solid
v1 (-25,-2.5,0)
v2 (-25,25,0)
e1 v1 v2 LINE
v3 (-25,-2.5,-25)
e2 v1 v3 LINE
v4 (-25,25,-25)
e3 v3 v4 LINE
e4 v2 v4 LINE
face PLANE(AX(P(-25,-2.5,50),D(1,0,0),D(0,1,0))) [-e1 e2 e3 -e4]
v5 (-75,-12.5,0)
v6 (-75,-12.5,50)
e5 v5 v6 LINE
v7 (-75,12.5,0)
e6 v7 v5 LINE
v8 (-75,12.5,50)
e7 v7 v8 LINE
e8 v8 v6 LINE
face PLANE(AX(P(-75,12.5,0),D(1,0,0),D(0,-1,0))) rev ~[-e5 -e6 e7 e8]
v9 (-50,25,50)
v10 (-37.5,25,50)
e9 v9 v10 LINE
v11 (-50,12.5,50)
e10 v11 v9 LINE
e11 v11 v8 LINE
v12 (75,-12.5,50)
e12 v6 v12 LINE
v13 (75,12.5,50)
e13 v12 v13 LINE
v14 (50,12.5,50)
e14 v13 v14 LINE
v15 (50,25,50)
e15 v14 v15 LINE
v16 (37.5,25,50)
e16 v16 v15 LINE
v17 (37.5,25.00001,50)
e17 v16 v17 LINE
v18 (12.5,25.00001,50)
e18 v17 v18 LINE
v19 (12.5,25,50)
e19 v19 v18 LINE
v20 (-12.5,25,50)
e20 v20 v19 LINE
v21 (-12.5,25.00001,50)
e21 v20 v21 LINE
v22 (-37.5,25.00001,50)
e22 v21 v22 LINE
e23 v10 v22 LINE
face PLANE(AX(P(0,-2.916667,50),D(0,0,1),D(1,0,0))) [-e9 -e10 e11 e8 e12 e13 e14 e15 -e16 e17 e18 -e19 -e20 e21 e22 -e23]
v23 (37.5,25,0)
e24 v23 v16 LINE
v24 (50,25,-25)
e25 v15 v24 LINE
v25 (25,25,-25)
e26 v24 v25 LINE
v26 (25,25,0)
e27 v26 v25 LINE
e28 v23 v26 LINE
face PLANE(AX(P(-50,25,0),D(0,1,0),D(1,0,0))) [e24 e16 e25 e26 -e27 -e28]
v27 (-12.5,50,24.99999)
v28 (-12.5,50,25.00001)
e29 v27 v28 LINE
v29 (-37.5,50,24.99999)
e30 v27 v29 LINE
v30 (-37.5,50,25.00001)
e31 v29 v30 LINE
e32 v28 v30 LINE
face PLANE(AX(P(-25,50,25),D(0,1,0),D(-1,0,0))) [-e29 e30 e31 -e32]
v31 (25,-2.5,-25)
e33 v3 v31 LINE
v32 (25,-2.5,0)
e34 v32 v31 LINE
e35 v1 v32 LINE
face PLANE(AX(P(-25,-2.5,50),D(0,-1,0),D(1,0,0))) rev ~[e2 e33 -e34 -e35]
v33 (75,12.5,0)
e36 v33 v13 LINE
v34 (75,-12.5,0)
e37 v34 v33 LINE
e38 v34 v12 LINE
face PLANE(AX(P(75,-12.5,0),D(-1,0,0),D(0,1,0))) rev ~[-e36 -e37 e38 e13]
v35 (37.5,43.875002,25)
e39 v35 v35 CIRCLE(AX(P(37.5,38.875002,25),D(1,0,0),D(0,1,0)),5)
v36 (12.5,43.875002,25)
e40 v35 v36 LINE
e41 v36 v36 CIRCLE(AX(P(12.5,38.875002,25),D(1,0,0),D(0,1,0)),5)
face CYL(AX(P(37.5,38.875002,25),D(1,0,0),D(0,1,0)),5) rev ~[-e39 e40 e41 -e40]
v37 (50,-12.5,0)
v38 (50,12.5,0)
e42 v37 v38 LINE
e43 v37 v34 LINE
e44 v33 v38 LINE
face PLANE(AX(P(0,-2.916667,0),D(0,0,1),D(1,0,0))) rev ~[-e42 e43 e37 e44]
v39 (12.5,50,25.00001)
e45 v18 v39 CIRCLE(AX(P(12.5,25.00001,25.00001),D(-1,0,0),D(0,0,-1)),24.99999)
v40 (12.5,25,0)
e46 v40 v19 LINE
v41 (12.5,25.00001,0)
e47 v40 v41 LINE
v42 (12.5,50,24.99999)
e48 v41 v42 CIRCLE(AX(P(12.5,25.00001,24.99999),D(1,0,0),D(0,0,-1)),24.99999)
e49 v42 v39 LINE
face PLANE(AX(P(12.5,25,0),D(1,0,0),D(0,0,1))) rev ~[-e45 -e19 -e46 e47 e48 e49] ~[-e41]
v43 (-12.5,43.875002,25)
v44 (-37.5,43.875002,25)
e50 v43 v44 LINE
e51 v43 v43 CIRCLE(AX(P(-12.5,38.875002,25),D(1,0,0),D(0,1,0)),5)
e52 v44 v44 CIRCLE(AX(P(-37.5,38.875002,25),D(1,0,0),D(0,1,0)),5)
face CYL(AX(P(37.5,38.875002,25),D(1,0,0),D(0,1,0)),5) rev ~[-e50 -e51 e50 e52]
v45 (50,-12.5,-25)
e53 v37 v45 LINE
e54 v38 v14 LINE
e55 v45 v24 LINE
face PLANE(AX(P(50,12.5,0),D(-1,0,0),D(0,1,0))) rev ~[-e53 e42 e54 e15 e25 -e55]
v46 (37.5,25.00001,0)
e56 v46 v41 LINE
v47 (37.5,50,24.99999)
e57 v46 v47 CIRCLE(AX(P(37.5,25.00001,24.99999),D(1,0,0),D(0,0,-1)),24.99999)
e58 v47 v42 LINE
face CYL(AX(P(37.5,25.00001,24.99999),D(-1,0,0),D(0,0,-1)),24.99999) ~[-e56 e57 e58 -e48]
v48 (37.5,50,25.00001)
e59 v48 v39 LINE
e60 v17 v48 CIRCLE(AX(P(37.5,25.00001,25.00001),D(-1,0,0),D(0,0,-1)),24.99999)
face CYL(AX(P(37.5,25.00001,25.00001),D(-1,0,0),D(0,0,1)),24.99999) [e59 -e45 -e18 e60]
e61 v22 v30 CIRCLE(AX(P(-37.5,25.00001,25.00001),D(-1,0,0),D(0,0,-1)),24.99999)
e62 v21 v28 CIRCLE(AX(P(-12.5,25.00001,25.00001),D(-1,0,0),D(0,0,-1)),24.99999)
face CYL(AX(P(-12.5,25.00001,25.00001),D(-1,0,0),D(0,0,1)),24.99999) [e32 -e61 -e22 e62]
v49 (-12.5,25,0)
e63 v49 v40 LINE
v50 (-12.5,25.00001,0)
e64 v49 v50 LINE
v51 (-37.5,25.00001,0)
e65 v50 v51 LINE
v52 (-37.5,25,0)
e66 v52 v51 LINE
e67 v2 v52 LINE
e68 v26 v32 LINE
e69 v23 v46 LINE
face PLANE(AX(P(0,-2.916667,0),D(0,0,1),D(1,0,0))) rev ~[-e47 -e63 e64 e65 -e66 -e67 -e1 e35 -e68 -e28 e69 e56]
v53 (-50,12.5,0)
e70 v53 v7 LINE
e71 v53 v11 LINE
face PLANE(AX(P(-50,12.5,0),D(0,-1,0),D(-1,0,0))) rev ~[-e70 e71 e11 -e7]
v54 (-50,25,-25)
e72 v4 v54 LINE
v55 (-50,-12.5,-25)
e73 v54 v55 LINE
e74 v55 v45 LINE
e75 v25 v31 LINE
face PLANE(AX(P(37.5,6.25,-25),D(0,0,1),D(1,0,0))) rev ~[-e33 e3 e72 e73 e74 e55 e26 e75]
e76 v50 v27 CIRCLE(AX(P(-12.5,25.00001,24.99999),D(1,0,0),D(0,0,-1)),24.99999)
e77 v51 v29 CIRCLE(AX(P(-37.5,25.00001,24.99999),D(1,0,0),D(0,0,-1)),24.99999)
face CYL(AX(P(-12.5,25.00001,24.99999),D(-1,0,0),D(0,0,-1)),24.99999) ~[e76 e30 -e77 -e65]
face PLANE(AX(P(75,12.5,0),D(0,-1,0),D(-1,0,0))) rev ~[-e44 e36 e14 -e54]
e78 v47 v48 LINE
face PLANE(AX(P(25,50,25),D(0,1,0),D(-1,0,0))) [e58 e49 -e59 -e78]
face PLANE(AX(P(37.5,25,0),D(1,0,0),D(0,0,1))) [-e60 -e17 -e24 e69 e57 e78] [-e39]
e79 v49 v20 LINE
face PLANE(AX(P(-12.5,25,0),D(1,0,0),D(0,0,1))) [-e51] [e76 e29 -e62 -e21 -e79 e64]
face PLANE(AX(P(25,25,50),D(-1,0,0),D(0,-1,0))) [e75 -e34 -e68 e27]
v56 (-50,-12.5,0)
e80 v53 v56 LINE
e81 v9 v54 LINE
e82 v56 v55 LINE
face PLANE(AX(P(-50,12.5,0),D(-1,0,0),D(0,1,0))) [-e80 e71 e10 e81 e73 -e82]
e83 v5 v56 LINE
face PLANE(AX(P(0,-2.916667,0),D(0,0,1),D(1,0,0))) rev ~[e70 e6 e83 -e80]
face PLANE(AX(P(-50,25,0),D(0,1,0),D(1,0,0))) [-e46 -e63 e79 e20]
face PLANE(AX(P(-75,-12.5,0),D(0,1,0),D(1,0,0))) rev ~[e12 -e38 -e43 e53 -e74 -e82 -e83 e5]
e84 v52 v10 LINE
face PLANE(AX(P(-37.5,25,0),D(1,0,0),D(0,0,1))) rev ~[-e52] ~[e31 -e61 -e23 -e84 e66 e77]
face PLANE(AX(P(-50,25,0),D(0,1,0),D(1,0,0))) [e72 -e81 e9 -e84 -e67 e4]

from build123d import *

# Parameters (mm, degrees)
F0_W     = 100
F0_H     = 12.5
F1_DEPTH = 50
F2_W     = 25
F2_H     = 50
F3_DEPTH = 25
F4_R     = 24.99999
F5_R     = 5
F6_DEPTH = 112.501
F7_W     = 50
F7_H     = 10
F8_DEPTH = 75


# Not quite as in the source:
# - a fillet or chamfer is up to 0.001 mm smaller than in the source, because OpenCascade refuses the exact size


with BuildPart() as f1:
    # F0 (on Top) → F1 (new body)
    with BuildSketch(Plane.XY):
        Polygon((75, -12.5), (75, 12.5), (50, 12.5), (50, 0), (-50, 0), (-50, 12.5), (-75, 12.5), (-75, -12.5), align=None)
        with Locations((0, 6.25)):
            Rectangle(F0_W, F0_H)
        with Locations((0, 18.75)):
            Rectangle(F0_W, F0_H)
    extrude(amount=F1_DEPTH)

    # F2 (on face) → F3 (join)
    with BuildSketch(Plane(origin=(0, 25, 0), x_dir=(-1, 0, 0), z_dir=(0, 1, 0))):
        with Locations((-25, 25)):
            Rectangle(F2_W, F2_H)
        with Locations((25, 25)):
            Rectangle(F2_W, F2_H)
    extrude(amount=F3_DEPTH)

    # F4 (radius 25 in the source; OpenCascade refuses exactly that, so slightly less here)
    f4_edges = [f1.edges().sort_by_distance(p)[0] for p in [
        (25, 50, 50),
        (25, 50, 0),
        (-25, 50, 0),
        (-25, 50, 50),
    ]]
    fillet(f4_edges, radius=F4_R)

    # F5 (on face) → F6 (cut, through all)
    with BuildSketch(Plane.YZ.offset(37.5)):
        with Locations((38.875002414, 25)):
            Circle(F5_R)
    extrude(amount=-F6_DEPTH, mode=Mode.SUBTRACT)

    # F7 (on face) → F8 (join)
    with BuildSketch(Plane.XY.offset(50)):
        Polygon((25, 25), (25, -2.5), (25, -12.5), (50, -12.5), (50, 12.5), (50, 25), (37.5, 25), align=None)
        with Locations((0, -7.5)):
            Rectangle(F7_W, F7_H)
        Polygon((-37.5, 25), (-50, 25), (-50, 12.5), (-50, -12.5), (-25, -12.5), (-25, -2.5), (-25, 25), align=None)
    extrude(amount=-F8_DEPTH)


solid = f1.part
